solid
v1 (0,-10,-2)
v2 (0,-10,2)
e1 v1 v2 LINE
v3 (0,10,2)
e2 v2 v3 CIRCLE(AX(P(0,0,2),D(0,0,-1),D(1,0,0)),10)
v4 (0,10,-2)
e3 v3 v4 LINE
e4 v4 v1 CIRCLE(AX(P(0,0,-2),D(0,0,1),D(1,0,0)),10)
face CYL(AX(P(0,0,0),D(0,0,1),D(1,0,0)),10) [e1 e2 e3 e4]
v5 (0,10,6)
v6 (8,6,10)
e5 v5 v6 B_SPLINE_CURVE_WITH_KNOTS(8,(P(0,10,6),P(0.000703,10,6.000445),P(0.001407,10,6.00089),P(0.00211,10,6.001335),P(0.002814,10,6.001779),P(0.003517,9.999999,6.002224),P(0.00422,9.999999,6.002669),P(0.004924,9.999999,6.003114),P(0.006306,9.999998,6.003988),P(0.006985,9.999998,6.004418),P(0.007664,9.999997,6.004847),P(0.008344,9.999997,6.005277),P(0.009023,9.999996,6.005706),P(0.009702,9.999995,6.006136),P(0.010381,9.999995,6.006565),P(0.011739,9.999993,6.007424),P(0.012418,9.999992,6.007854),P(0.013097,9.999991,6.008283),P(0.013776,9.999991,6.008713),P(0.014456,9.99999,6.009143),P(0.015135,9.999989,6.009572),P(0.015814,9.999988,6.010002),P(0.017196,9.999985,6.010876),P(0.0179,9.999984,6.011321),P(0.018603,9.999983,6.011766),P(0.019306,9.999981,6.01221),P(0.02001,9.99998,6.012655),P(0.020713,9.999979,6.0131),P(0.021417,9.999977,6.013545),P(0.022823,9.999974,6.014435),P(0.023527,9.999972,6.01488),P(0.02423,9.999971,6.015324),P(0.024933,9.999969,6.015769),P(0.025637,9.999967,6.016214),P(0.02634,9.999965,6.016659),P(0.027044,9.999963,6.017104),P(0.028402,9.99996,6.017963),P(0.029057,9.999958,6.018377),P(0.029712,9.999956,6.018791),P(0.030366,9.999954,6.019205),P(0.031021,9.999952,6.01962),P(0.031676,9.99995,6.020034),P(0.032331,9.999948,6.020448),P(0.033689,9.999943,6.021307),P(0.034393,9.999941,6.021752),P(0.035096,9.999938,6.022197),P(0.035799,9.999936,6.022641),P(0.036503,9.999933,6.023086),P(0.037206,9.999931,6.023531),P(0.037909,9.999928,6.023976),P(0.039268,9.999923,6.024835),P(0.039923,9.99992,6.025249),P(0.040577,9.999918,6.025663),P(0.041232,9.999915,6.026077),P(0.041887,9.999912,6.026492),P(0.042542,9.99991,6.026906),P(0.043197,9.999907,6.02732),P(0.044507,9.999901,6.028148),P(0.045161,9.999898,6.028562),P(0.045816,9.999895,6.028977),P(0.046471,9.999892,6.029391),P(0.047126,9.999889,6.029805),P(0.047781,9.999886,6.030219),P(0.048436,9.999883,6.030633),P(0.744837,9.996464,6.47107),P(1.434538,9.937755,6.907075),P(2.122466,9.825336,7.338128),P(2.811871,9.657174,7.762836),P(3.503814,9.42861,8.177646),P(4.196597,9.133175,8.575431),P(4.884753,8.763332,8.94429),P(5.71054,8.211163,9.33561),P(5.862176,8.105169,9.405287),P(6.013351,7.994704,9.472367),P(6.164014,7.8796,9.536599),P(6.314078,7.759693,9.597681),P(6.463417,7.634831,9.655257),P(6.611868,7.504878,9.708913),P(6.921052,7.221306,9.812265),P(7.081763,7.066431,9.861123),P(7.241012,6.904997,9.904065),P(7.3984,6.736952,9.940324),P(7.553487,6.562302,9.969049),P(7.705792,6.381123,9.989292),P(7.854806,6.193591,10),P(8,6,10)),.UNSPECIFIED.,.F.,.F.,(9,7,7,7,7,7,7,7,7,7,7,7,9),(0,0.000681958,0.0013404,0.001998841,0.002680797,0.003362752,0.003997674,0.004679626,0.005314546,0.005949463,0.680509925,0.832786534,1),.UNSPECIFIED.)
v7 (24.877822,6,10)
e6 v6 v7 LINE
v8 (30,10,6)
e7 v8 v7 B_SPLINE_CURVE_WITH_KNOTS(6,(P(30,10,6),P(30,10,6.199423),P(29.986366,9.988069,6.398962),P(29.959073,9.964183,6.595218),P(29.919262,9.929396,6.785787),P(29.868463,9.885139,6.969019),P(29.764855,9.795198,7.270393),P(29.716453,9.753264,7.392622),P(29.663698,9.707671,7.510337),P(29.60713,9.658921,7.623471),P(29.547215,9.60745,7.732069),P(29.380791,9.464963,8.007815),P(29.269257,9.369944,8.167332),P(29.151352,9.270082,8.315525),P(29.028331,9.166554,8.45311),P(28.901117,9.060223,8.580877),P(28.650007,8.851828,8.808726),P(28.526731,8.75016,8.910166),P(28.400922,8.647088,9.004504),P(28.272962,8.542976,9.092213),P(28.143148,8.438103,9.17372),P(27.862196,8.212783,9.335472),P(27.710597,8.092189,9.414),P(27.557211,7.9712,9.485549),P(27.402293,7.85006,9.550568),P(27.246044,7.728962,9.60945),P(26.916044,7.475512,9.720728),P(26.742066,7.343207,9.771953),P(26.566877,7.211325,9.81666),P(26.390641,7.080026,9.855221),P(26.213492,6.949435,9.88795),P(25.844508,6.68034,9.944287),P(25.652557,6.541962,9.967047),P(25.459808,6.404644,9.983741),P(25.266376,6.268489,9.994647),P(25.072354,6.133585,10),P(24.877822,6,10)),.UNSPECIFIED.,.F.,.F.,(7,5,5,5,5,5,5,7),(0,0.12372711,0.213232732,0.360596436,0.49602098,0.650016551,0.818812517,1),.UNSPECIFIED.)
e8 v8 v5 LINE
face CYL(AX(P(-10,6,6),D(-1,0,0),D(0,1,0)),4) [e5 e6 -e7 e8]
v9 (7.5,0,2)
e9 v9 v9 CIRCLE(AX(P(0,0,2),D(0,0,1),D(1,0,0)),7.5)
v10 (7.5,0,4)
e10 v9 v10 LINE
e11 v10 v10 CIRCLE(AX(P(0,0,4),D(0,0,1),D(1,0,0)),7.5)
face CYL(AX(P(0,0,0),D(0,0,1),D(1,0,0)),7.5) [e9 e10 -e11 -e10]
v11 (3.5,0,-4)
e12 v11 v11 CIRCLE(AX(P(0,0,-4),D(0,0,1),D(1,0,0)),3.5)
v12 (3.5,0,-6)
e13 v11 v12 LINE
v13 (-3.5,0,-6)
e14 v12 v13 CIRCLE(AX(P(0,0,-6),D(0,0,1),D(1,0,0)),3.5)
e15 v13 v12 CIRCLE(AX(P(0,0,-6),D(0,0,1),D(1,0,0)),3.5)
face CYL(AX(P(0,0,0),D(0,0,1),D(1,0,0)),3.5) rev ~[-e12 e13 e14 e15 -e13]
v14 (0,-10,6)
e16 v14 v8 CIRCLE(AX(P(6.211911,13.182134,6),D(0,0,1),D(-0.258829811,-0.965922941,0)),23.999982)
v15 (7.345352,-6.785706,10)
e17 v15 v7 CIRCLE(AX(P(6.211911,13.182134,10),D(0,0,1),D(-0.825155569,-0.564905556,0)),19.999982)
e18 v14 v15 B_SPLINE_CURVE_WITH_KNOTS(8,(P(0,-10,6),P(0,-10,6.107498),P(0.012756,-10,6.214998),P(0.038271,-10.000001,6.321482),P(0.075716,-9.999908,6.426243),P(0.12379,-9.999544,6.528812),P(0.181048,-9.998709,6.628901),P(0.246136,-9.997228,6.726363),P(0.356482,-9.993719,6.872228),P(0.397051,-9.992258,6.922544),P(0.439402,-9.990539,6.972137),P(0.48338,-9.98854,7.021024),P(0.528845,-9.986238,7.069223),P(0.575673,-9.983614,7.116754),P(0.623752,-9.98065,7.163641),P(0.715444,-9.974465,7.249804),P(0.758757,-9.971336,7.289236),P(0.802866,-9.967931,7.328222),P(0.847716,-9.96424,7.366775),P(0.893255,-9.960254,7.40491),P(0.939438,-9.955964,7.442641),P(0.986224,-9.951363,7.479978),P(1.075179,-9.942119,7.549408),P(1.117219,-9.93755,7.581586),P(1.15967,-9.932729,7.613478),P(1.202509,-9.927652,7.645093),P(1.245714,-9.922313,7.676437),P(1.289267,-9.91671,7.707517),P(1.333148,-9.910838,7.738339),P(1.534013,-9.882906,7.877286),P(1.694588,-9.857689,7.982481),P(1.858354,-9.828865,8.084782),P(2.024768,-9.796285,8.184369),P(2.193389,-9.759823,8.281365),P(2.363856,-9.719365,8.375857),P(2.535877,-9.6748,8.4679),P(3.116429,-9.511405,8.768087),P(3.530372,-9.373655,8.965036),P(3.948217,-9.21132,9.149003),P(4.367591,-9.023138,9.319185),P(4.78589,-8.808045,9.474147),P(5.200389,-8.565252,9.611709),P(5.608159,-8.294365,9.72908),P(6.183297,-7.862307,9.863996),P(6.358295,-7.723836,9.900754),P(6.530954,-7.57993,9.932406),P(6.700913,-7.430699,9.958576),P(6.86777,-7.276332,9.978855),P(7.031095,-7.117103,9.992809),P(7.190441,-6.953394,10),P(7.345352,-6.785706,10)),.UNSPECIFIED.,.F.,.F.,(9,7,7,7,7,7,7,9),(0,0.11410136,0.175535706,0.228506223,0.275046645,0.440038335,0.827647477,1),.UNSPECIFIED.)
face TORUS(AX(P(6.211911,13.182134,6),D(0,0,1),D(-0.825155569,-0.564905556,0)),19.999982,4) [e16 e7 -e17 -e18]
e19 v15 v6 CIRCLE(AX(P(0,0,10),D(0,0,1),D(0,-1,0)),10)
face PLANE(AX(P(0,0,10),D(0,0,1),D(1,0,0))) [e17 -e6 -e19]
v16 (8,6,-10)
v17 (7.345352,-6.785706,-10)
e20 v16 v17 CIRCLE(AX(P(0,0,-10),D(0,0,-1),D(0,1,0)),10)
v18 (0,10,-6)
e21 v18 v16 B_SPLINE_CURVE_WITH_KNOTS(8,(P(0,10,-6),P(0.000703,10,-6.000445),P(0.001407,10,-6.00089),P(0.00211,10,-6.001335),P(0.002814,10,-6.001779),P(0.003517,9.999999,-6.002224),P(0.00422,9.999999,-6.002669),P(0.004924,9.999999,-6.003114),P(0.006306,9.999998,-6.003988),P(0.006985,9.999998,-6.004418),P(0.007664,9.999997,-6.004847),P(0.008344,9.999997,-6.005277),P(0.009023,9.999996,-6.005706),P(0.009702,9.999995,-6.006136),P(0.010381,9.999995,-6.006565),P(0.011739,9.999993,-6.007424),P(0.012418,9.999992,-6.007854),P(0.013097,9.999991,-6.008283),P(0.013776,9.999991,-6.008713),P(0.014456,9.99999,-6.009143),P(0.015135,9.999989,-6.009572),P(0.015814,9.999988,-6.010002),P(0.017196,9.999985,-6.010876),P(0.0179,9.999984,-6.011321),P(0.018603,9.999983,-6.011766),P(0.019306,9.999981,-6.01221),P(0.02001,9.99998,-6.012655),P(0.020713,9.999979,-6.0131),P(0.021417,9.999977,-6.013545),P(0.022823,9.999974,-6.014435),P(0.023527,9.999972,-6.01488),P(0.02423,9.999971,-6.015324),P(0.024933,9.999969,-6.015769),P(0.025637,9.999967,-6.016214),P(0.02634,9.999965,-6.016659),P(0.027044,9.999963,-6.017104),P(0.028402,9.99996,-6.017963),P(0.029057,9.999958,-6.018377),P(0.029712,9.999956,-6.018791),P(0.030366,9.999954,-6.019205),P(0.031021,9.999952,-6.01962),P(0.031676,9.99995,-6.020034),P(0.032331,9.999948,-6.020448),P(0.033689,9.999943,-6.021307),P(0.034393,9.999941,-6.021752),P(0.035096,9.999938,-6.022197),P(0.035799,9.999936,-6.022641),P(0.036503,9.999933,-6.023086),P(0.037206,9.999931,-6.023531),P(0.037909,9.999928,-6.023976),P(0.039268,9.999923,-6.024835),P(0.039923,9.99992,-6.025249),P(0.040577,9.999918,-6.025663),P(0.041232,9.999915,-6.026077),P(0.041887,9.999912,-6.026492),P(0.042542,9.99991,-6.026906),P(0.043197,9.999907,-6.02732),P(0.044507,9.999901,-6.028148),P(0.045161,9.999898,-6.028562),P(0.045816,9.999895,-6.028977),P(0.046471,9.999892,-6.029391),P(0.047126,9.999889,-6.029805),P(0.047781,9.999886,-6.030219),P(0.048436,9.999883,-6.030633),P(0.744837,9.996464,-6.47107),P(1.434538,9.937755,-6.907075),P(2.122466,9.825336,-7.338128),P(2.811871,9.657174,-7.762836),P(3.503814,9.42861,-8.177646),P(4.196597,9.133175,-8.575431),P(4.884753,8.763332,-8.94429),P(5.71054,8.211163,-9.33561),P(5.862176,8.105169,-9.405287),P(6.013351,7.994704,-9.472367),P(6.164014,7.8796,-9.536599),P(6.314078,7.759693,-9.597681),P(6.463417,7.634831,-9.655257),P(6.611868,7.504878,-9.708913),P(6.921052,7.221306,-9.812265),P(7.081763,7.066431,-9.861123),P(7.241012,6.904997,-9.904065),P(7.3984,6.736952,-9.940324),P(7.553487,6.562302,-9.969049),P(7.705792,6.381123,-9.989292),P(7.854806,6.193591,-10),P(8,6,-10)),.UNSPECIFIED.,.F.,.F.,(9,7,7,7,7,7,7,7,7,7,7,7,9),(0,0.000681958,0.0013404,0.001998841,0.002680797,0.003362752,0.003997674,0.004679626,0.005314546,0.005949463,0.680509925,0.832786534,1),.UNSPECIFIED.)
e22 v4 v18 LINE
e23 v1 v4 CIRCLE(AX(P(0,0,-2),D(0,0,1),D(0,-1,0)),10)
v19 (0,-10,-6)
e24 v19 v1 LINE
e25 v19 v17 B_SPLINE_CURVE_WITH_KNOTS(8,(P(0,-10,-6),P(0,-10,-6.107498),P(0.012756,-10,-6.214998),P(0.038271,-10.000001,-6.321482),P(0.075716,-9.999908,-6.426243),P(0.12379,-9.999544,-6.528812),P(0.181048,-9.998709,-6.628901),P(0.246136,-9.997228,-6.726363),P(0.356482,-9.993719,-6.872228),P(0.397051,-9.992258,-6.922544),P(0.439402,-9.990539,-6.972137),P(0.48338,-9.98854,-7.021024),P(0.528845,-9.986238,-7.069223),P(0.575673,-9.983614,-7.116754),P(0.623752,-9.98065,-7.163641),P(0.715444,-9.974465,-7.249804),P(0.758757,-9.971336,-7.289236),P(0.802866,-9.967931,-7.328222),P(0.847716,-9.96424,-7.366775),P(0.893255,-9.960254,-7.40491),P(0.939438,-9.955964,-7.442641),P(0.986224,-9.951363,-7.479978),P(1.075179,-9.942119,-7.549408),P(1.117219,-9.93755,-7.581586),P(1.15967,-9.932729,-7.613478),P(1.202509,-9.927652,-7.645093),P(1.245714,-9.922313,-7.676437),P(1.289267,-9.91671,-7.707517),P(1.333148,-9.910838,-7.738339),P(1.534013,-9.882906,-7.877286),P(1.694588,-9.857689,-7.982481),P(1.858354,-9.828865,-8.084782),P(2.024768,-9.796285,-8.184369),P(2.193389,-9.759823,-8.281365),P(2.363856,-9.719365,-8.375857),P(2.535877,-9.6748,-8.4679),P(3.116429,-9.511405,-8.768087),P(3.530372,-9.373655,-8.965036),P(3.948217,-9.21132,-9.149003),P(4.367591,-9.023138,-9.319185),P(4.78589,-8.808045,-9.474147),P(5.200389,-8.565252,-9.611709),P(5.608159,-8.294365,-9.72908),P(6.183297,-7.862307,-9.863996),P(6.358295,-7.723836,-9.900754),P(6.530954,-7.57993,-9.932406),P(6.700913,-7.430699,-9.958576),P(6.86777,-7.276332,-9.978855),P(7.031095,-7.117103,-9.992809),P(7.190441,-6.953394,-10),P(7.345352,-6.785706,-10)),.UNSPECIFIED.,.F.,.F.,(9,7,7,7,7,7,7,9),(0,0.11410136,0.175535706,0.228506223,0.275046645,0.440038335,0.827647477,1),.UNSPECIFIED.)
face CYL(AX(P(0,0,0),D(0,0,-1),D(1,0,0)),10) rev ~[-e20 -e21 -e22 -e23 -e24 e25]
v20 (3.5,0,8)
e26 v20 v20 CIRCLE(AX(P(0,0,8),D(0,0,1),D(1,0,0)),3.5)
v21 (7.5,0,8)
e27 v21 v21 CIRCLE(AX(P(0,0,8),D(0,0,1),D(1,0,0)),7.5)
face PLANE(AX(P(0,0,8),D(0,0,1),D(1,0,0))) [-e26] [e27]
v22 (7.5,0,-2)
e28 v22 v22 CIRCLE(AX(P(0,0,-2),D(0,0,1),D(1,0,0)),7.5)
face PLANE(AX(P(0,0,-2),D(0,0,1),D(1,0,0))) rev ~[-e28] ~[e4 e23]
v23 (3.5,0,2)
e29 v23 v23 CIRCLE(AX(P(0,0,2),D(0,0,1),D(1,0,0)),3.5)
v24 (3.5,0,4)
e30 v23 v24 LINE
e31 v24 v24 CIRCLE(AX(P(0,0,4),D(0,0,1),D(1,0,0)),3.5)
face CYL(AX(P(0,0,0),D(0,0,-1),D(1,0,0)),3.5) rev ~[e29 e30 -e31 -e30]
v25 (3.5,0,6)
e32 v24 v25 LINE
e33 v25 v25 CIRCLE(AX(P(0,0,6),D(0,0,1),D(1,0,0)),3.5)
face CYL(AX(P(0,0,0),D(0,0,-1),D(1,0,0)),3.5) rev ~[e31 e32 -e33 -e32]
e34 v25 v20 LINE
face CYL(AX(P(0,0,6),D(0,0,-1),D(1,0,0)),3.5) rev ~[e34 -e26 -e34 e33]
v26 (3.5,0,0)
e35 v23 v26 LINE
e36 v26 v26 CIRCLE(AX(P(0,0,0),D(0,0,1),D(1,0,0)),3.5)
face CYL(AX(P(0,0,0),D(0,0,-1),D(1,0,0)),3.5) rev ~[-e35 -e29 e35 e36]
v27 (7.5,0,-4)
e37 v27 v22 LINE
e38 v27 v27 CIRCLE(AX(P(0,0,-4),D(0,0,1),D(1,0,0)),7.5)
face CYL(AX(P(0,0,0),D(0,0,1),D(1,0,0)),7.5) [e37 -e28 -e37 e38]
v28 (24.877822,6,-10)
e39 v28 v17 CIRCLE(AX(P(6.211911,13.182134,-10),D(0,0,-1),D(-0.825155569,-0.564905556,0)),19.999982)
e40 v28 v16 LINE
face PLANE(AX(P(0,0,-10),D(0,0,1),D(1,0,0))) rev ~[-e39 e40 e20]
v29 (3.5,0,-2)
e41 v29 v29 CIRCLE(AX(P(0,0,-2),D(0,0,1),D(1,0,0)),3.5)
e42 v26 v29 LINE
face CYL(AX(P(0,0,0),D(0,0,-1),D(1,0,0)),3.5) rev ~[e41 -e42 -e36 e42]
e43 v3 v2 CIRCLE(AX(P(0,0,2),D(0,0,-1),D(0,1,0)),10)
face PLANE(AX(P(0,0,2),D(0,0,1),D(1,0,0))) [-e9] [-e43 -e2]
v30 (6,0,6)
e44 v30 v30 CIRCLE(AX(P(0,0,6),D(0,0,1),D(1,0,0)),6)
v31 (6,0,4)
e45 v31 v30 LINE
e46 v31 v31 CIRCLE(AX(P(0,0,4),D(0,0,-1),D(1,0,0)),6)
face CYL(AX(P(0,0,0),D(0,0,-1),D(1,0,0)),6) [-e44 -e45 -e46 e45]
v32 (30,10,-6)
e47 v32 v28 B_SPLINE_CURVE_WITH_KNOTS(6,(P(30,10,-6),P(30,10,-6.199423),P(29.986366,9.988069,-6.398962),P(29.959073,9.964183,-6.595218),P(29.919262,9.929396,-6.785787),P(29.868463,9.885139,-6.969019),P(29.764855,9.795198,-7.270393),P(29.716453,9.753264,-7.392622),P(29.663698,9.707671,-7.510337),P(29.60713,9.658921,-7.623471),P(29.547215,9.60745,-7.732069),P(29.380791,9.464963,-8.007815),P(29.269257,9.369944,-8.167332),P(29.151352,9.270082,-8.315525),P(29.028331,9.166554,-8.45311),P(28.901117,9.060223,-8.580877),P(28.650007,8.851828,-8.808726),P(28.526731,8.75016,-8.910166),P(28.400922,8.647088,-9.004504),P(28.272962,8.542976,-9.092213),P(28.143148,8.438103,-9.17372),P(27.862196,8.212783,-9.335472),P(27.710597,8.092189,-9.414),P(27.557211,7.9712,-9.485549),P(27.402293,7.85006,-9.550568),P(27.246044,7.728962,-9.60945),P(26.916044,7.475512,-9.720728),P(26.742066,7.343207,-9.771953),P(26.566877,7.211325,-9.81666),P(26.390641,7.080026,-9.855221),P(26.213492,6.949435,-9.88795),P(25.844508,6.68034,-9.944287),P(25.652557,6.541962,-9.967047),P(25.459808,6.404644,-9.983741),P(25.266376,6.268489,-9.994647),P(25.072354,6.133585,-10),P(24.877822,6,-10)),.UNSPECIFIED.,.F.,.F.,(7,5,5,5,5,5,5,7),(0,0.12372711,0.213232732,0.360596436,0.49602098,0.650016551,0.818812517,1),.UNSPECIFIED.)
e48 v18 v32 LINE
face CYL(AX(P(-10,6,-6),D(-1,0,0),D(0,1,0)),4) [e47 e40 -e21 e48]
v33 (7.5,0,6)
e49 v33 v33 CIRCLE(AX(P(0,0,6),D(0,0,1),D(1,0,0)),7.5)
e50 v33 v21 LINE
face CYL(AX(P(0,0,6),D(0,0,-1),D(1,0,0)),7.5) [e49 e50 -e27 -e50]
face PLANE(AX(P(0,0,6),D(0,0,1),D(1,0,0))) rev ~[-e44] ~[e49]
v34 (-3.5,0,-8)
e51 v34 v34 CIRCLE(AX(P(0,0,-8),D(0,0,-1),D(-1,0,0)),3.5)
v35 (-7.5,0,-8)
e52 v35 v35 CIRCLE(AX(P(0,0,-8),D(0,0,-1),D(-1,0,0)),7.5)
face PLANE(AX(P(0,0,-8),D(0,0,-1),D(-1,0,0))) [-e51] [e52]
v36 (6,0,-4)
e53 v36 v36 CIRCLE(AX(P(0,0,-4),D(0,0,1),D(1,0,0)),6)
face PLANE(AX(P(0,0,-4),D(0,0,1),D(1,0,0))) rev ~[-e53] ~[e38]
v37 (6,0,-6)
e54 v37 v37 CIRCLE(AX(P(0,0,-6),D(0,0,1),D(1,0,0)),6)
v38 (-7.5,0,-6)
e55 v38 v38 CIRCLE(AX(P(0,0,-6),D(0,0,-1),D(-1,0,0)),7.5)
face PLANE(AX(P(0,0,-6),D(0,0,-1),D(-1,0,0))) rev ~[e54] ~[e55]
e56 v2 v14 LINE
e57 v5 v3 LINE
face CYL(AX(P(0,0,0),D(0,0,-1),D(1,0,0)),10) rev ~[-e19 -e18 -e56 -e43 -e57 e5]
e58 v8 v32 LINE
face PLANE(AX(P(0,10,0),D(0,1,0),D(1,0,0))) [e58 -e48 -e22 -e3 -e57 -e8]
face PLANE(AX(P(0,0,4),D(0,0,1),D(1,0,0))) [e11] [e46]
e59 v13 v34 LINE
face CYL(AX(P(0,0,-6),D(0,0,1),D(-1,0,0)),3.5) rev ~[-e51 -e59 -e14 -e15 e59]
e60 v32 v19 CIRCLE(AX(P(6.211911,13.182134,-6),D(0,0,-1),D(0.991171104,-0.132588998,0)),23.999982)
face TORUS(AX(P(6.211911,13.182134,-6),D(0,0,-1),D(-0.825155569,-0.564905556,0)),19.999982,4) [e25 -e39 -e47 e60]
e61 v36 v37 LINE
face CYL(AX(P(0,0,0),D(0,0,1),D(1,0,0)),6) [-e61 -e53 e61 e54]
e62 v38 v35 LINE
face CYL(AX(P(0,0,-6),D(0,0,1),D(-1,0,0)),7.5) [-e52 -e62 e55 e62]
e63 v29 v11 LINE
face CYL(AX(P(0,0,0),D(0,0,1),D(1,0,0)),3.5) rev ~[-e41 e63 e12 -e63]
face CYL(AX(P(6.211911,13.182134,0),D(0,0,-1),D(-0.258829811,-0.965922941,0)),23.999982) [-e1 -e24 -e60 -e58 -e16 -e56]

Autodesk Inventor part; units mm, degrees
ref_plane "YZ Plane" through (0, 0, 0) normal (1, 0, 0) x (0, 1, 0)
ref_plane "XZ Plane" through (0, 0, 0) normal (0, 1, 0) x (-1, 0, 0)
ref_plane "XY Plane" through (0, 0, 0) normal (0, 0, 1) x (1, 0, 0)
sketch "Sketch1" plane through (0, 0, 0) normal (0, 0, 1) x (1, 0, 0)
  circle A0 centre (0, 0) radius 10
  line L0 (0, 10) -> (30, 10)
  arc A1 (0, -10) -> (30, 10) centre (6.2119, 13.1822) ccw
  circle A2 centre (0, 0) radius 3.5
  circle A3 centre (0, 0) radius 7.5
  circle A4 centre (0, 0) radius 6
  dimension "d0" = 20
  dimension "d1" = 30
  dimension "d2" = 24
  dimension "d3" = 10
  dimension "d4" = 13.1822
  dimension "d5" = 7
  dimension "d6" = 15
  dimension "d7" = 12
extrude "Extrusion1" add sketch "Sketch1" along normal mid plane 20 contours A0 L0 A1
extrude "Extrusion2" add sketch "Sketch1" along normal mid plane 4 contours A0 | A3 | A4
extrude "Extrusion3" add sketch "Sketch1" along normal mid plane 8 contours A3 | A4
extrude "Extrusion4" add sketch "Sketch1" along normal mid plane 12 contours A4
sketch "Sketch2" plane through (0, 0, 6) normal (0, 0, 1) x (1, 0, 0)
  circle A0 centre (0, 0) radius 7.5
  circle A1 centre (0, 0) radius 3.5
  dimension "d16" = 15
  dimension "d18" = 7
sketch "Sketch3" plane through (0, 0, -6) normal (0, 0, -1) x (-1, 0, 0)
  circle A0 centre (0, 0) radius 7.5
  circle A1 centre (0, 0) radius 3.5
  dimension "d17" = 15
  dimension "d19" = 7
extrude "Extrusion5" add sketch "Sketch3" along normal blind 2
extrude "Extrusion6" add sketch "Sketch2" along normal blind 2
fillet "Fillet1" radius 4 4 edges at (15, 10, -10) (19.5247, -6.7871, -10) (19.5247, -6.7871, 10) (15, 10, 10)
properties part number "TapPart"
